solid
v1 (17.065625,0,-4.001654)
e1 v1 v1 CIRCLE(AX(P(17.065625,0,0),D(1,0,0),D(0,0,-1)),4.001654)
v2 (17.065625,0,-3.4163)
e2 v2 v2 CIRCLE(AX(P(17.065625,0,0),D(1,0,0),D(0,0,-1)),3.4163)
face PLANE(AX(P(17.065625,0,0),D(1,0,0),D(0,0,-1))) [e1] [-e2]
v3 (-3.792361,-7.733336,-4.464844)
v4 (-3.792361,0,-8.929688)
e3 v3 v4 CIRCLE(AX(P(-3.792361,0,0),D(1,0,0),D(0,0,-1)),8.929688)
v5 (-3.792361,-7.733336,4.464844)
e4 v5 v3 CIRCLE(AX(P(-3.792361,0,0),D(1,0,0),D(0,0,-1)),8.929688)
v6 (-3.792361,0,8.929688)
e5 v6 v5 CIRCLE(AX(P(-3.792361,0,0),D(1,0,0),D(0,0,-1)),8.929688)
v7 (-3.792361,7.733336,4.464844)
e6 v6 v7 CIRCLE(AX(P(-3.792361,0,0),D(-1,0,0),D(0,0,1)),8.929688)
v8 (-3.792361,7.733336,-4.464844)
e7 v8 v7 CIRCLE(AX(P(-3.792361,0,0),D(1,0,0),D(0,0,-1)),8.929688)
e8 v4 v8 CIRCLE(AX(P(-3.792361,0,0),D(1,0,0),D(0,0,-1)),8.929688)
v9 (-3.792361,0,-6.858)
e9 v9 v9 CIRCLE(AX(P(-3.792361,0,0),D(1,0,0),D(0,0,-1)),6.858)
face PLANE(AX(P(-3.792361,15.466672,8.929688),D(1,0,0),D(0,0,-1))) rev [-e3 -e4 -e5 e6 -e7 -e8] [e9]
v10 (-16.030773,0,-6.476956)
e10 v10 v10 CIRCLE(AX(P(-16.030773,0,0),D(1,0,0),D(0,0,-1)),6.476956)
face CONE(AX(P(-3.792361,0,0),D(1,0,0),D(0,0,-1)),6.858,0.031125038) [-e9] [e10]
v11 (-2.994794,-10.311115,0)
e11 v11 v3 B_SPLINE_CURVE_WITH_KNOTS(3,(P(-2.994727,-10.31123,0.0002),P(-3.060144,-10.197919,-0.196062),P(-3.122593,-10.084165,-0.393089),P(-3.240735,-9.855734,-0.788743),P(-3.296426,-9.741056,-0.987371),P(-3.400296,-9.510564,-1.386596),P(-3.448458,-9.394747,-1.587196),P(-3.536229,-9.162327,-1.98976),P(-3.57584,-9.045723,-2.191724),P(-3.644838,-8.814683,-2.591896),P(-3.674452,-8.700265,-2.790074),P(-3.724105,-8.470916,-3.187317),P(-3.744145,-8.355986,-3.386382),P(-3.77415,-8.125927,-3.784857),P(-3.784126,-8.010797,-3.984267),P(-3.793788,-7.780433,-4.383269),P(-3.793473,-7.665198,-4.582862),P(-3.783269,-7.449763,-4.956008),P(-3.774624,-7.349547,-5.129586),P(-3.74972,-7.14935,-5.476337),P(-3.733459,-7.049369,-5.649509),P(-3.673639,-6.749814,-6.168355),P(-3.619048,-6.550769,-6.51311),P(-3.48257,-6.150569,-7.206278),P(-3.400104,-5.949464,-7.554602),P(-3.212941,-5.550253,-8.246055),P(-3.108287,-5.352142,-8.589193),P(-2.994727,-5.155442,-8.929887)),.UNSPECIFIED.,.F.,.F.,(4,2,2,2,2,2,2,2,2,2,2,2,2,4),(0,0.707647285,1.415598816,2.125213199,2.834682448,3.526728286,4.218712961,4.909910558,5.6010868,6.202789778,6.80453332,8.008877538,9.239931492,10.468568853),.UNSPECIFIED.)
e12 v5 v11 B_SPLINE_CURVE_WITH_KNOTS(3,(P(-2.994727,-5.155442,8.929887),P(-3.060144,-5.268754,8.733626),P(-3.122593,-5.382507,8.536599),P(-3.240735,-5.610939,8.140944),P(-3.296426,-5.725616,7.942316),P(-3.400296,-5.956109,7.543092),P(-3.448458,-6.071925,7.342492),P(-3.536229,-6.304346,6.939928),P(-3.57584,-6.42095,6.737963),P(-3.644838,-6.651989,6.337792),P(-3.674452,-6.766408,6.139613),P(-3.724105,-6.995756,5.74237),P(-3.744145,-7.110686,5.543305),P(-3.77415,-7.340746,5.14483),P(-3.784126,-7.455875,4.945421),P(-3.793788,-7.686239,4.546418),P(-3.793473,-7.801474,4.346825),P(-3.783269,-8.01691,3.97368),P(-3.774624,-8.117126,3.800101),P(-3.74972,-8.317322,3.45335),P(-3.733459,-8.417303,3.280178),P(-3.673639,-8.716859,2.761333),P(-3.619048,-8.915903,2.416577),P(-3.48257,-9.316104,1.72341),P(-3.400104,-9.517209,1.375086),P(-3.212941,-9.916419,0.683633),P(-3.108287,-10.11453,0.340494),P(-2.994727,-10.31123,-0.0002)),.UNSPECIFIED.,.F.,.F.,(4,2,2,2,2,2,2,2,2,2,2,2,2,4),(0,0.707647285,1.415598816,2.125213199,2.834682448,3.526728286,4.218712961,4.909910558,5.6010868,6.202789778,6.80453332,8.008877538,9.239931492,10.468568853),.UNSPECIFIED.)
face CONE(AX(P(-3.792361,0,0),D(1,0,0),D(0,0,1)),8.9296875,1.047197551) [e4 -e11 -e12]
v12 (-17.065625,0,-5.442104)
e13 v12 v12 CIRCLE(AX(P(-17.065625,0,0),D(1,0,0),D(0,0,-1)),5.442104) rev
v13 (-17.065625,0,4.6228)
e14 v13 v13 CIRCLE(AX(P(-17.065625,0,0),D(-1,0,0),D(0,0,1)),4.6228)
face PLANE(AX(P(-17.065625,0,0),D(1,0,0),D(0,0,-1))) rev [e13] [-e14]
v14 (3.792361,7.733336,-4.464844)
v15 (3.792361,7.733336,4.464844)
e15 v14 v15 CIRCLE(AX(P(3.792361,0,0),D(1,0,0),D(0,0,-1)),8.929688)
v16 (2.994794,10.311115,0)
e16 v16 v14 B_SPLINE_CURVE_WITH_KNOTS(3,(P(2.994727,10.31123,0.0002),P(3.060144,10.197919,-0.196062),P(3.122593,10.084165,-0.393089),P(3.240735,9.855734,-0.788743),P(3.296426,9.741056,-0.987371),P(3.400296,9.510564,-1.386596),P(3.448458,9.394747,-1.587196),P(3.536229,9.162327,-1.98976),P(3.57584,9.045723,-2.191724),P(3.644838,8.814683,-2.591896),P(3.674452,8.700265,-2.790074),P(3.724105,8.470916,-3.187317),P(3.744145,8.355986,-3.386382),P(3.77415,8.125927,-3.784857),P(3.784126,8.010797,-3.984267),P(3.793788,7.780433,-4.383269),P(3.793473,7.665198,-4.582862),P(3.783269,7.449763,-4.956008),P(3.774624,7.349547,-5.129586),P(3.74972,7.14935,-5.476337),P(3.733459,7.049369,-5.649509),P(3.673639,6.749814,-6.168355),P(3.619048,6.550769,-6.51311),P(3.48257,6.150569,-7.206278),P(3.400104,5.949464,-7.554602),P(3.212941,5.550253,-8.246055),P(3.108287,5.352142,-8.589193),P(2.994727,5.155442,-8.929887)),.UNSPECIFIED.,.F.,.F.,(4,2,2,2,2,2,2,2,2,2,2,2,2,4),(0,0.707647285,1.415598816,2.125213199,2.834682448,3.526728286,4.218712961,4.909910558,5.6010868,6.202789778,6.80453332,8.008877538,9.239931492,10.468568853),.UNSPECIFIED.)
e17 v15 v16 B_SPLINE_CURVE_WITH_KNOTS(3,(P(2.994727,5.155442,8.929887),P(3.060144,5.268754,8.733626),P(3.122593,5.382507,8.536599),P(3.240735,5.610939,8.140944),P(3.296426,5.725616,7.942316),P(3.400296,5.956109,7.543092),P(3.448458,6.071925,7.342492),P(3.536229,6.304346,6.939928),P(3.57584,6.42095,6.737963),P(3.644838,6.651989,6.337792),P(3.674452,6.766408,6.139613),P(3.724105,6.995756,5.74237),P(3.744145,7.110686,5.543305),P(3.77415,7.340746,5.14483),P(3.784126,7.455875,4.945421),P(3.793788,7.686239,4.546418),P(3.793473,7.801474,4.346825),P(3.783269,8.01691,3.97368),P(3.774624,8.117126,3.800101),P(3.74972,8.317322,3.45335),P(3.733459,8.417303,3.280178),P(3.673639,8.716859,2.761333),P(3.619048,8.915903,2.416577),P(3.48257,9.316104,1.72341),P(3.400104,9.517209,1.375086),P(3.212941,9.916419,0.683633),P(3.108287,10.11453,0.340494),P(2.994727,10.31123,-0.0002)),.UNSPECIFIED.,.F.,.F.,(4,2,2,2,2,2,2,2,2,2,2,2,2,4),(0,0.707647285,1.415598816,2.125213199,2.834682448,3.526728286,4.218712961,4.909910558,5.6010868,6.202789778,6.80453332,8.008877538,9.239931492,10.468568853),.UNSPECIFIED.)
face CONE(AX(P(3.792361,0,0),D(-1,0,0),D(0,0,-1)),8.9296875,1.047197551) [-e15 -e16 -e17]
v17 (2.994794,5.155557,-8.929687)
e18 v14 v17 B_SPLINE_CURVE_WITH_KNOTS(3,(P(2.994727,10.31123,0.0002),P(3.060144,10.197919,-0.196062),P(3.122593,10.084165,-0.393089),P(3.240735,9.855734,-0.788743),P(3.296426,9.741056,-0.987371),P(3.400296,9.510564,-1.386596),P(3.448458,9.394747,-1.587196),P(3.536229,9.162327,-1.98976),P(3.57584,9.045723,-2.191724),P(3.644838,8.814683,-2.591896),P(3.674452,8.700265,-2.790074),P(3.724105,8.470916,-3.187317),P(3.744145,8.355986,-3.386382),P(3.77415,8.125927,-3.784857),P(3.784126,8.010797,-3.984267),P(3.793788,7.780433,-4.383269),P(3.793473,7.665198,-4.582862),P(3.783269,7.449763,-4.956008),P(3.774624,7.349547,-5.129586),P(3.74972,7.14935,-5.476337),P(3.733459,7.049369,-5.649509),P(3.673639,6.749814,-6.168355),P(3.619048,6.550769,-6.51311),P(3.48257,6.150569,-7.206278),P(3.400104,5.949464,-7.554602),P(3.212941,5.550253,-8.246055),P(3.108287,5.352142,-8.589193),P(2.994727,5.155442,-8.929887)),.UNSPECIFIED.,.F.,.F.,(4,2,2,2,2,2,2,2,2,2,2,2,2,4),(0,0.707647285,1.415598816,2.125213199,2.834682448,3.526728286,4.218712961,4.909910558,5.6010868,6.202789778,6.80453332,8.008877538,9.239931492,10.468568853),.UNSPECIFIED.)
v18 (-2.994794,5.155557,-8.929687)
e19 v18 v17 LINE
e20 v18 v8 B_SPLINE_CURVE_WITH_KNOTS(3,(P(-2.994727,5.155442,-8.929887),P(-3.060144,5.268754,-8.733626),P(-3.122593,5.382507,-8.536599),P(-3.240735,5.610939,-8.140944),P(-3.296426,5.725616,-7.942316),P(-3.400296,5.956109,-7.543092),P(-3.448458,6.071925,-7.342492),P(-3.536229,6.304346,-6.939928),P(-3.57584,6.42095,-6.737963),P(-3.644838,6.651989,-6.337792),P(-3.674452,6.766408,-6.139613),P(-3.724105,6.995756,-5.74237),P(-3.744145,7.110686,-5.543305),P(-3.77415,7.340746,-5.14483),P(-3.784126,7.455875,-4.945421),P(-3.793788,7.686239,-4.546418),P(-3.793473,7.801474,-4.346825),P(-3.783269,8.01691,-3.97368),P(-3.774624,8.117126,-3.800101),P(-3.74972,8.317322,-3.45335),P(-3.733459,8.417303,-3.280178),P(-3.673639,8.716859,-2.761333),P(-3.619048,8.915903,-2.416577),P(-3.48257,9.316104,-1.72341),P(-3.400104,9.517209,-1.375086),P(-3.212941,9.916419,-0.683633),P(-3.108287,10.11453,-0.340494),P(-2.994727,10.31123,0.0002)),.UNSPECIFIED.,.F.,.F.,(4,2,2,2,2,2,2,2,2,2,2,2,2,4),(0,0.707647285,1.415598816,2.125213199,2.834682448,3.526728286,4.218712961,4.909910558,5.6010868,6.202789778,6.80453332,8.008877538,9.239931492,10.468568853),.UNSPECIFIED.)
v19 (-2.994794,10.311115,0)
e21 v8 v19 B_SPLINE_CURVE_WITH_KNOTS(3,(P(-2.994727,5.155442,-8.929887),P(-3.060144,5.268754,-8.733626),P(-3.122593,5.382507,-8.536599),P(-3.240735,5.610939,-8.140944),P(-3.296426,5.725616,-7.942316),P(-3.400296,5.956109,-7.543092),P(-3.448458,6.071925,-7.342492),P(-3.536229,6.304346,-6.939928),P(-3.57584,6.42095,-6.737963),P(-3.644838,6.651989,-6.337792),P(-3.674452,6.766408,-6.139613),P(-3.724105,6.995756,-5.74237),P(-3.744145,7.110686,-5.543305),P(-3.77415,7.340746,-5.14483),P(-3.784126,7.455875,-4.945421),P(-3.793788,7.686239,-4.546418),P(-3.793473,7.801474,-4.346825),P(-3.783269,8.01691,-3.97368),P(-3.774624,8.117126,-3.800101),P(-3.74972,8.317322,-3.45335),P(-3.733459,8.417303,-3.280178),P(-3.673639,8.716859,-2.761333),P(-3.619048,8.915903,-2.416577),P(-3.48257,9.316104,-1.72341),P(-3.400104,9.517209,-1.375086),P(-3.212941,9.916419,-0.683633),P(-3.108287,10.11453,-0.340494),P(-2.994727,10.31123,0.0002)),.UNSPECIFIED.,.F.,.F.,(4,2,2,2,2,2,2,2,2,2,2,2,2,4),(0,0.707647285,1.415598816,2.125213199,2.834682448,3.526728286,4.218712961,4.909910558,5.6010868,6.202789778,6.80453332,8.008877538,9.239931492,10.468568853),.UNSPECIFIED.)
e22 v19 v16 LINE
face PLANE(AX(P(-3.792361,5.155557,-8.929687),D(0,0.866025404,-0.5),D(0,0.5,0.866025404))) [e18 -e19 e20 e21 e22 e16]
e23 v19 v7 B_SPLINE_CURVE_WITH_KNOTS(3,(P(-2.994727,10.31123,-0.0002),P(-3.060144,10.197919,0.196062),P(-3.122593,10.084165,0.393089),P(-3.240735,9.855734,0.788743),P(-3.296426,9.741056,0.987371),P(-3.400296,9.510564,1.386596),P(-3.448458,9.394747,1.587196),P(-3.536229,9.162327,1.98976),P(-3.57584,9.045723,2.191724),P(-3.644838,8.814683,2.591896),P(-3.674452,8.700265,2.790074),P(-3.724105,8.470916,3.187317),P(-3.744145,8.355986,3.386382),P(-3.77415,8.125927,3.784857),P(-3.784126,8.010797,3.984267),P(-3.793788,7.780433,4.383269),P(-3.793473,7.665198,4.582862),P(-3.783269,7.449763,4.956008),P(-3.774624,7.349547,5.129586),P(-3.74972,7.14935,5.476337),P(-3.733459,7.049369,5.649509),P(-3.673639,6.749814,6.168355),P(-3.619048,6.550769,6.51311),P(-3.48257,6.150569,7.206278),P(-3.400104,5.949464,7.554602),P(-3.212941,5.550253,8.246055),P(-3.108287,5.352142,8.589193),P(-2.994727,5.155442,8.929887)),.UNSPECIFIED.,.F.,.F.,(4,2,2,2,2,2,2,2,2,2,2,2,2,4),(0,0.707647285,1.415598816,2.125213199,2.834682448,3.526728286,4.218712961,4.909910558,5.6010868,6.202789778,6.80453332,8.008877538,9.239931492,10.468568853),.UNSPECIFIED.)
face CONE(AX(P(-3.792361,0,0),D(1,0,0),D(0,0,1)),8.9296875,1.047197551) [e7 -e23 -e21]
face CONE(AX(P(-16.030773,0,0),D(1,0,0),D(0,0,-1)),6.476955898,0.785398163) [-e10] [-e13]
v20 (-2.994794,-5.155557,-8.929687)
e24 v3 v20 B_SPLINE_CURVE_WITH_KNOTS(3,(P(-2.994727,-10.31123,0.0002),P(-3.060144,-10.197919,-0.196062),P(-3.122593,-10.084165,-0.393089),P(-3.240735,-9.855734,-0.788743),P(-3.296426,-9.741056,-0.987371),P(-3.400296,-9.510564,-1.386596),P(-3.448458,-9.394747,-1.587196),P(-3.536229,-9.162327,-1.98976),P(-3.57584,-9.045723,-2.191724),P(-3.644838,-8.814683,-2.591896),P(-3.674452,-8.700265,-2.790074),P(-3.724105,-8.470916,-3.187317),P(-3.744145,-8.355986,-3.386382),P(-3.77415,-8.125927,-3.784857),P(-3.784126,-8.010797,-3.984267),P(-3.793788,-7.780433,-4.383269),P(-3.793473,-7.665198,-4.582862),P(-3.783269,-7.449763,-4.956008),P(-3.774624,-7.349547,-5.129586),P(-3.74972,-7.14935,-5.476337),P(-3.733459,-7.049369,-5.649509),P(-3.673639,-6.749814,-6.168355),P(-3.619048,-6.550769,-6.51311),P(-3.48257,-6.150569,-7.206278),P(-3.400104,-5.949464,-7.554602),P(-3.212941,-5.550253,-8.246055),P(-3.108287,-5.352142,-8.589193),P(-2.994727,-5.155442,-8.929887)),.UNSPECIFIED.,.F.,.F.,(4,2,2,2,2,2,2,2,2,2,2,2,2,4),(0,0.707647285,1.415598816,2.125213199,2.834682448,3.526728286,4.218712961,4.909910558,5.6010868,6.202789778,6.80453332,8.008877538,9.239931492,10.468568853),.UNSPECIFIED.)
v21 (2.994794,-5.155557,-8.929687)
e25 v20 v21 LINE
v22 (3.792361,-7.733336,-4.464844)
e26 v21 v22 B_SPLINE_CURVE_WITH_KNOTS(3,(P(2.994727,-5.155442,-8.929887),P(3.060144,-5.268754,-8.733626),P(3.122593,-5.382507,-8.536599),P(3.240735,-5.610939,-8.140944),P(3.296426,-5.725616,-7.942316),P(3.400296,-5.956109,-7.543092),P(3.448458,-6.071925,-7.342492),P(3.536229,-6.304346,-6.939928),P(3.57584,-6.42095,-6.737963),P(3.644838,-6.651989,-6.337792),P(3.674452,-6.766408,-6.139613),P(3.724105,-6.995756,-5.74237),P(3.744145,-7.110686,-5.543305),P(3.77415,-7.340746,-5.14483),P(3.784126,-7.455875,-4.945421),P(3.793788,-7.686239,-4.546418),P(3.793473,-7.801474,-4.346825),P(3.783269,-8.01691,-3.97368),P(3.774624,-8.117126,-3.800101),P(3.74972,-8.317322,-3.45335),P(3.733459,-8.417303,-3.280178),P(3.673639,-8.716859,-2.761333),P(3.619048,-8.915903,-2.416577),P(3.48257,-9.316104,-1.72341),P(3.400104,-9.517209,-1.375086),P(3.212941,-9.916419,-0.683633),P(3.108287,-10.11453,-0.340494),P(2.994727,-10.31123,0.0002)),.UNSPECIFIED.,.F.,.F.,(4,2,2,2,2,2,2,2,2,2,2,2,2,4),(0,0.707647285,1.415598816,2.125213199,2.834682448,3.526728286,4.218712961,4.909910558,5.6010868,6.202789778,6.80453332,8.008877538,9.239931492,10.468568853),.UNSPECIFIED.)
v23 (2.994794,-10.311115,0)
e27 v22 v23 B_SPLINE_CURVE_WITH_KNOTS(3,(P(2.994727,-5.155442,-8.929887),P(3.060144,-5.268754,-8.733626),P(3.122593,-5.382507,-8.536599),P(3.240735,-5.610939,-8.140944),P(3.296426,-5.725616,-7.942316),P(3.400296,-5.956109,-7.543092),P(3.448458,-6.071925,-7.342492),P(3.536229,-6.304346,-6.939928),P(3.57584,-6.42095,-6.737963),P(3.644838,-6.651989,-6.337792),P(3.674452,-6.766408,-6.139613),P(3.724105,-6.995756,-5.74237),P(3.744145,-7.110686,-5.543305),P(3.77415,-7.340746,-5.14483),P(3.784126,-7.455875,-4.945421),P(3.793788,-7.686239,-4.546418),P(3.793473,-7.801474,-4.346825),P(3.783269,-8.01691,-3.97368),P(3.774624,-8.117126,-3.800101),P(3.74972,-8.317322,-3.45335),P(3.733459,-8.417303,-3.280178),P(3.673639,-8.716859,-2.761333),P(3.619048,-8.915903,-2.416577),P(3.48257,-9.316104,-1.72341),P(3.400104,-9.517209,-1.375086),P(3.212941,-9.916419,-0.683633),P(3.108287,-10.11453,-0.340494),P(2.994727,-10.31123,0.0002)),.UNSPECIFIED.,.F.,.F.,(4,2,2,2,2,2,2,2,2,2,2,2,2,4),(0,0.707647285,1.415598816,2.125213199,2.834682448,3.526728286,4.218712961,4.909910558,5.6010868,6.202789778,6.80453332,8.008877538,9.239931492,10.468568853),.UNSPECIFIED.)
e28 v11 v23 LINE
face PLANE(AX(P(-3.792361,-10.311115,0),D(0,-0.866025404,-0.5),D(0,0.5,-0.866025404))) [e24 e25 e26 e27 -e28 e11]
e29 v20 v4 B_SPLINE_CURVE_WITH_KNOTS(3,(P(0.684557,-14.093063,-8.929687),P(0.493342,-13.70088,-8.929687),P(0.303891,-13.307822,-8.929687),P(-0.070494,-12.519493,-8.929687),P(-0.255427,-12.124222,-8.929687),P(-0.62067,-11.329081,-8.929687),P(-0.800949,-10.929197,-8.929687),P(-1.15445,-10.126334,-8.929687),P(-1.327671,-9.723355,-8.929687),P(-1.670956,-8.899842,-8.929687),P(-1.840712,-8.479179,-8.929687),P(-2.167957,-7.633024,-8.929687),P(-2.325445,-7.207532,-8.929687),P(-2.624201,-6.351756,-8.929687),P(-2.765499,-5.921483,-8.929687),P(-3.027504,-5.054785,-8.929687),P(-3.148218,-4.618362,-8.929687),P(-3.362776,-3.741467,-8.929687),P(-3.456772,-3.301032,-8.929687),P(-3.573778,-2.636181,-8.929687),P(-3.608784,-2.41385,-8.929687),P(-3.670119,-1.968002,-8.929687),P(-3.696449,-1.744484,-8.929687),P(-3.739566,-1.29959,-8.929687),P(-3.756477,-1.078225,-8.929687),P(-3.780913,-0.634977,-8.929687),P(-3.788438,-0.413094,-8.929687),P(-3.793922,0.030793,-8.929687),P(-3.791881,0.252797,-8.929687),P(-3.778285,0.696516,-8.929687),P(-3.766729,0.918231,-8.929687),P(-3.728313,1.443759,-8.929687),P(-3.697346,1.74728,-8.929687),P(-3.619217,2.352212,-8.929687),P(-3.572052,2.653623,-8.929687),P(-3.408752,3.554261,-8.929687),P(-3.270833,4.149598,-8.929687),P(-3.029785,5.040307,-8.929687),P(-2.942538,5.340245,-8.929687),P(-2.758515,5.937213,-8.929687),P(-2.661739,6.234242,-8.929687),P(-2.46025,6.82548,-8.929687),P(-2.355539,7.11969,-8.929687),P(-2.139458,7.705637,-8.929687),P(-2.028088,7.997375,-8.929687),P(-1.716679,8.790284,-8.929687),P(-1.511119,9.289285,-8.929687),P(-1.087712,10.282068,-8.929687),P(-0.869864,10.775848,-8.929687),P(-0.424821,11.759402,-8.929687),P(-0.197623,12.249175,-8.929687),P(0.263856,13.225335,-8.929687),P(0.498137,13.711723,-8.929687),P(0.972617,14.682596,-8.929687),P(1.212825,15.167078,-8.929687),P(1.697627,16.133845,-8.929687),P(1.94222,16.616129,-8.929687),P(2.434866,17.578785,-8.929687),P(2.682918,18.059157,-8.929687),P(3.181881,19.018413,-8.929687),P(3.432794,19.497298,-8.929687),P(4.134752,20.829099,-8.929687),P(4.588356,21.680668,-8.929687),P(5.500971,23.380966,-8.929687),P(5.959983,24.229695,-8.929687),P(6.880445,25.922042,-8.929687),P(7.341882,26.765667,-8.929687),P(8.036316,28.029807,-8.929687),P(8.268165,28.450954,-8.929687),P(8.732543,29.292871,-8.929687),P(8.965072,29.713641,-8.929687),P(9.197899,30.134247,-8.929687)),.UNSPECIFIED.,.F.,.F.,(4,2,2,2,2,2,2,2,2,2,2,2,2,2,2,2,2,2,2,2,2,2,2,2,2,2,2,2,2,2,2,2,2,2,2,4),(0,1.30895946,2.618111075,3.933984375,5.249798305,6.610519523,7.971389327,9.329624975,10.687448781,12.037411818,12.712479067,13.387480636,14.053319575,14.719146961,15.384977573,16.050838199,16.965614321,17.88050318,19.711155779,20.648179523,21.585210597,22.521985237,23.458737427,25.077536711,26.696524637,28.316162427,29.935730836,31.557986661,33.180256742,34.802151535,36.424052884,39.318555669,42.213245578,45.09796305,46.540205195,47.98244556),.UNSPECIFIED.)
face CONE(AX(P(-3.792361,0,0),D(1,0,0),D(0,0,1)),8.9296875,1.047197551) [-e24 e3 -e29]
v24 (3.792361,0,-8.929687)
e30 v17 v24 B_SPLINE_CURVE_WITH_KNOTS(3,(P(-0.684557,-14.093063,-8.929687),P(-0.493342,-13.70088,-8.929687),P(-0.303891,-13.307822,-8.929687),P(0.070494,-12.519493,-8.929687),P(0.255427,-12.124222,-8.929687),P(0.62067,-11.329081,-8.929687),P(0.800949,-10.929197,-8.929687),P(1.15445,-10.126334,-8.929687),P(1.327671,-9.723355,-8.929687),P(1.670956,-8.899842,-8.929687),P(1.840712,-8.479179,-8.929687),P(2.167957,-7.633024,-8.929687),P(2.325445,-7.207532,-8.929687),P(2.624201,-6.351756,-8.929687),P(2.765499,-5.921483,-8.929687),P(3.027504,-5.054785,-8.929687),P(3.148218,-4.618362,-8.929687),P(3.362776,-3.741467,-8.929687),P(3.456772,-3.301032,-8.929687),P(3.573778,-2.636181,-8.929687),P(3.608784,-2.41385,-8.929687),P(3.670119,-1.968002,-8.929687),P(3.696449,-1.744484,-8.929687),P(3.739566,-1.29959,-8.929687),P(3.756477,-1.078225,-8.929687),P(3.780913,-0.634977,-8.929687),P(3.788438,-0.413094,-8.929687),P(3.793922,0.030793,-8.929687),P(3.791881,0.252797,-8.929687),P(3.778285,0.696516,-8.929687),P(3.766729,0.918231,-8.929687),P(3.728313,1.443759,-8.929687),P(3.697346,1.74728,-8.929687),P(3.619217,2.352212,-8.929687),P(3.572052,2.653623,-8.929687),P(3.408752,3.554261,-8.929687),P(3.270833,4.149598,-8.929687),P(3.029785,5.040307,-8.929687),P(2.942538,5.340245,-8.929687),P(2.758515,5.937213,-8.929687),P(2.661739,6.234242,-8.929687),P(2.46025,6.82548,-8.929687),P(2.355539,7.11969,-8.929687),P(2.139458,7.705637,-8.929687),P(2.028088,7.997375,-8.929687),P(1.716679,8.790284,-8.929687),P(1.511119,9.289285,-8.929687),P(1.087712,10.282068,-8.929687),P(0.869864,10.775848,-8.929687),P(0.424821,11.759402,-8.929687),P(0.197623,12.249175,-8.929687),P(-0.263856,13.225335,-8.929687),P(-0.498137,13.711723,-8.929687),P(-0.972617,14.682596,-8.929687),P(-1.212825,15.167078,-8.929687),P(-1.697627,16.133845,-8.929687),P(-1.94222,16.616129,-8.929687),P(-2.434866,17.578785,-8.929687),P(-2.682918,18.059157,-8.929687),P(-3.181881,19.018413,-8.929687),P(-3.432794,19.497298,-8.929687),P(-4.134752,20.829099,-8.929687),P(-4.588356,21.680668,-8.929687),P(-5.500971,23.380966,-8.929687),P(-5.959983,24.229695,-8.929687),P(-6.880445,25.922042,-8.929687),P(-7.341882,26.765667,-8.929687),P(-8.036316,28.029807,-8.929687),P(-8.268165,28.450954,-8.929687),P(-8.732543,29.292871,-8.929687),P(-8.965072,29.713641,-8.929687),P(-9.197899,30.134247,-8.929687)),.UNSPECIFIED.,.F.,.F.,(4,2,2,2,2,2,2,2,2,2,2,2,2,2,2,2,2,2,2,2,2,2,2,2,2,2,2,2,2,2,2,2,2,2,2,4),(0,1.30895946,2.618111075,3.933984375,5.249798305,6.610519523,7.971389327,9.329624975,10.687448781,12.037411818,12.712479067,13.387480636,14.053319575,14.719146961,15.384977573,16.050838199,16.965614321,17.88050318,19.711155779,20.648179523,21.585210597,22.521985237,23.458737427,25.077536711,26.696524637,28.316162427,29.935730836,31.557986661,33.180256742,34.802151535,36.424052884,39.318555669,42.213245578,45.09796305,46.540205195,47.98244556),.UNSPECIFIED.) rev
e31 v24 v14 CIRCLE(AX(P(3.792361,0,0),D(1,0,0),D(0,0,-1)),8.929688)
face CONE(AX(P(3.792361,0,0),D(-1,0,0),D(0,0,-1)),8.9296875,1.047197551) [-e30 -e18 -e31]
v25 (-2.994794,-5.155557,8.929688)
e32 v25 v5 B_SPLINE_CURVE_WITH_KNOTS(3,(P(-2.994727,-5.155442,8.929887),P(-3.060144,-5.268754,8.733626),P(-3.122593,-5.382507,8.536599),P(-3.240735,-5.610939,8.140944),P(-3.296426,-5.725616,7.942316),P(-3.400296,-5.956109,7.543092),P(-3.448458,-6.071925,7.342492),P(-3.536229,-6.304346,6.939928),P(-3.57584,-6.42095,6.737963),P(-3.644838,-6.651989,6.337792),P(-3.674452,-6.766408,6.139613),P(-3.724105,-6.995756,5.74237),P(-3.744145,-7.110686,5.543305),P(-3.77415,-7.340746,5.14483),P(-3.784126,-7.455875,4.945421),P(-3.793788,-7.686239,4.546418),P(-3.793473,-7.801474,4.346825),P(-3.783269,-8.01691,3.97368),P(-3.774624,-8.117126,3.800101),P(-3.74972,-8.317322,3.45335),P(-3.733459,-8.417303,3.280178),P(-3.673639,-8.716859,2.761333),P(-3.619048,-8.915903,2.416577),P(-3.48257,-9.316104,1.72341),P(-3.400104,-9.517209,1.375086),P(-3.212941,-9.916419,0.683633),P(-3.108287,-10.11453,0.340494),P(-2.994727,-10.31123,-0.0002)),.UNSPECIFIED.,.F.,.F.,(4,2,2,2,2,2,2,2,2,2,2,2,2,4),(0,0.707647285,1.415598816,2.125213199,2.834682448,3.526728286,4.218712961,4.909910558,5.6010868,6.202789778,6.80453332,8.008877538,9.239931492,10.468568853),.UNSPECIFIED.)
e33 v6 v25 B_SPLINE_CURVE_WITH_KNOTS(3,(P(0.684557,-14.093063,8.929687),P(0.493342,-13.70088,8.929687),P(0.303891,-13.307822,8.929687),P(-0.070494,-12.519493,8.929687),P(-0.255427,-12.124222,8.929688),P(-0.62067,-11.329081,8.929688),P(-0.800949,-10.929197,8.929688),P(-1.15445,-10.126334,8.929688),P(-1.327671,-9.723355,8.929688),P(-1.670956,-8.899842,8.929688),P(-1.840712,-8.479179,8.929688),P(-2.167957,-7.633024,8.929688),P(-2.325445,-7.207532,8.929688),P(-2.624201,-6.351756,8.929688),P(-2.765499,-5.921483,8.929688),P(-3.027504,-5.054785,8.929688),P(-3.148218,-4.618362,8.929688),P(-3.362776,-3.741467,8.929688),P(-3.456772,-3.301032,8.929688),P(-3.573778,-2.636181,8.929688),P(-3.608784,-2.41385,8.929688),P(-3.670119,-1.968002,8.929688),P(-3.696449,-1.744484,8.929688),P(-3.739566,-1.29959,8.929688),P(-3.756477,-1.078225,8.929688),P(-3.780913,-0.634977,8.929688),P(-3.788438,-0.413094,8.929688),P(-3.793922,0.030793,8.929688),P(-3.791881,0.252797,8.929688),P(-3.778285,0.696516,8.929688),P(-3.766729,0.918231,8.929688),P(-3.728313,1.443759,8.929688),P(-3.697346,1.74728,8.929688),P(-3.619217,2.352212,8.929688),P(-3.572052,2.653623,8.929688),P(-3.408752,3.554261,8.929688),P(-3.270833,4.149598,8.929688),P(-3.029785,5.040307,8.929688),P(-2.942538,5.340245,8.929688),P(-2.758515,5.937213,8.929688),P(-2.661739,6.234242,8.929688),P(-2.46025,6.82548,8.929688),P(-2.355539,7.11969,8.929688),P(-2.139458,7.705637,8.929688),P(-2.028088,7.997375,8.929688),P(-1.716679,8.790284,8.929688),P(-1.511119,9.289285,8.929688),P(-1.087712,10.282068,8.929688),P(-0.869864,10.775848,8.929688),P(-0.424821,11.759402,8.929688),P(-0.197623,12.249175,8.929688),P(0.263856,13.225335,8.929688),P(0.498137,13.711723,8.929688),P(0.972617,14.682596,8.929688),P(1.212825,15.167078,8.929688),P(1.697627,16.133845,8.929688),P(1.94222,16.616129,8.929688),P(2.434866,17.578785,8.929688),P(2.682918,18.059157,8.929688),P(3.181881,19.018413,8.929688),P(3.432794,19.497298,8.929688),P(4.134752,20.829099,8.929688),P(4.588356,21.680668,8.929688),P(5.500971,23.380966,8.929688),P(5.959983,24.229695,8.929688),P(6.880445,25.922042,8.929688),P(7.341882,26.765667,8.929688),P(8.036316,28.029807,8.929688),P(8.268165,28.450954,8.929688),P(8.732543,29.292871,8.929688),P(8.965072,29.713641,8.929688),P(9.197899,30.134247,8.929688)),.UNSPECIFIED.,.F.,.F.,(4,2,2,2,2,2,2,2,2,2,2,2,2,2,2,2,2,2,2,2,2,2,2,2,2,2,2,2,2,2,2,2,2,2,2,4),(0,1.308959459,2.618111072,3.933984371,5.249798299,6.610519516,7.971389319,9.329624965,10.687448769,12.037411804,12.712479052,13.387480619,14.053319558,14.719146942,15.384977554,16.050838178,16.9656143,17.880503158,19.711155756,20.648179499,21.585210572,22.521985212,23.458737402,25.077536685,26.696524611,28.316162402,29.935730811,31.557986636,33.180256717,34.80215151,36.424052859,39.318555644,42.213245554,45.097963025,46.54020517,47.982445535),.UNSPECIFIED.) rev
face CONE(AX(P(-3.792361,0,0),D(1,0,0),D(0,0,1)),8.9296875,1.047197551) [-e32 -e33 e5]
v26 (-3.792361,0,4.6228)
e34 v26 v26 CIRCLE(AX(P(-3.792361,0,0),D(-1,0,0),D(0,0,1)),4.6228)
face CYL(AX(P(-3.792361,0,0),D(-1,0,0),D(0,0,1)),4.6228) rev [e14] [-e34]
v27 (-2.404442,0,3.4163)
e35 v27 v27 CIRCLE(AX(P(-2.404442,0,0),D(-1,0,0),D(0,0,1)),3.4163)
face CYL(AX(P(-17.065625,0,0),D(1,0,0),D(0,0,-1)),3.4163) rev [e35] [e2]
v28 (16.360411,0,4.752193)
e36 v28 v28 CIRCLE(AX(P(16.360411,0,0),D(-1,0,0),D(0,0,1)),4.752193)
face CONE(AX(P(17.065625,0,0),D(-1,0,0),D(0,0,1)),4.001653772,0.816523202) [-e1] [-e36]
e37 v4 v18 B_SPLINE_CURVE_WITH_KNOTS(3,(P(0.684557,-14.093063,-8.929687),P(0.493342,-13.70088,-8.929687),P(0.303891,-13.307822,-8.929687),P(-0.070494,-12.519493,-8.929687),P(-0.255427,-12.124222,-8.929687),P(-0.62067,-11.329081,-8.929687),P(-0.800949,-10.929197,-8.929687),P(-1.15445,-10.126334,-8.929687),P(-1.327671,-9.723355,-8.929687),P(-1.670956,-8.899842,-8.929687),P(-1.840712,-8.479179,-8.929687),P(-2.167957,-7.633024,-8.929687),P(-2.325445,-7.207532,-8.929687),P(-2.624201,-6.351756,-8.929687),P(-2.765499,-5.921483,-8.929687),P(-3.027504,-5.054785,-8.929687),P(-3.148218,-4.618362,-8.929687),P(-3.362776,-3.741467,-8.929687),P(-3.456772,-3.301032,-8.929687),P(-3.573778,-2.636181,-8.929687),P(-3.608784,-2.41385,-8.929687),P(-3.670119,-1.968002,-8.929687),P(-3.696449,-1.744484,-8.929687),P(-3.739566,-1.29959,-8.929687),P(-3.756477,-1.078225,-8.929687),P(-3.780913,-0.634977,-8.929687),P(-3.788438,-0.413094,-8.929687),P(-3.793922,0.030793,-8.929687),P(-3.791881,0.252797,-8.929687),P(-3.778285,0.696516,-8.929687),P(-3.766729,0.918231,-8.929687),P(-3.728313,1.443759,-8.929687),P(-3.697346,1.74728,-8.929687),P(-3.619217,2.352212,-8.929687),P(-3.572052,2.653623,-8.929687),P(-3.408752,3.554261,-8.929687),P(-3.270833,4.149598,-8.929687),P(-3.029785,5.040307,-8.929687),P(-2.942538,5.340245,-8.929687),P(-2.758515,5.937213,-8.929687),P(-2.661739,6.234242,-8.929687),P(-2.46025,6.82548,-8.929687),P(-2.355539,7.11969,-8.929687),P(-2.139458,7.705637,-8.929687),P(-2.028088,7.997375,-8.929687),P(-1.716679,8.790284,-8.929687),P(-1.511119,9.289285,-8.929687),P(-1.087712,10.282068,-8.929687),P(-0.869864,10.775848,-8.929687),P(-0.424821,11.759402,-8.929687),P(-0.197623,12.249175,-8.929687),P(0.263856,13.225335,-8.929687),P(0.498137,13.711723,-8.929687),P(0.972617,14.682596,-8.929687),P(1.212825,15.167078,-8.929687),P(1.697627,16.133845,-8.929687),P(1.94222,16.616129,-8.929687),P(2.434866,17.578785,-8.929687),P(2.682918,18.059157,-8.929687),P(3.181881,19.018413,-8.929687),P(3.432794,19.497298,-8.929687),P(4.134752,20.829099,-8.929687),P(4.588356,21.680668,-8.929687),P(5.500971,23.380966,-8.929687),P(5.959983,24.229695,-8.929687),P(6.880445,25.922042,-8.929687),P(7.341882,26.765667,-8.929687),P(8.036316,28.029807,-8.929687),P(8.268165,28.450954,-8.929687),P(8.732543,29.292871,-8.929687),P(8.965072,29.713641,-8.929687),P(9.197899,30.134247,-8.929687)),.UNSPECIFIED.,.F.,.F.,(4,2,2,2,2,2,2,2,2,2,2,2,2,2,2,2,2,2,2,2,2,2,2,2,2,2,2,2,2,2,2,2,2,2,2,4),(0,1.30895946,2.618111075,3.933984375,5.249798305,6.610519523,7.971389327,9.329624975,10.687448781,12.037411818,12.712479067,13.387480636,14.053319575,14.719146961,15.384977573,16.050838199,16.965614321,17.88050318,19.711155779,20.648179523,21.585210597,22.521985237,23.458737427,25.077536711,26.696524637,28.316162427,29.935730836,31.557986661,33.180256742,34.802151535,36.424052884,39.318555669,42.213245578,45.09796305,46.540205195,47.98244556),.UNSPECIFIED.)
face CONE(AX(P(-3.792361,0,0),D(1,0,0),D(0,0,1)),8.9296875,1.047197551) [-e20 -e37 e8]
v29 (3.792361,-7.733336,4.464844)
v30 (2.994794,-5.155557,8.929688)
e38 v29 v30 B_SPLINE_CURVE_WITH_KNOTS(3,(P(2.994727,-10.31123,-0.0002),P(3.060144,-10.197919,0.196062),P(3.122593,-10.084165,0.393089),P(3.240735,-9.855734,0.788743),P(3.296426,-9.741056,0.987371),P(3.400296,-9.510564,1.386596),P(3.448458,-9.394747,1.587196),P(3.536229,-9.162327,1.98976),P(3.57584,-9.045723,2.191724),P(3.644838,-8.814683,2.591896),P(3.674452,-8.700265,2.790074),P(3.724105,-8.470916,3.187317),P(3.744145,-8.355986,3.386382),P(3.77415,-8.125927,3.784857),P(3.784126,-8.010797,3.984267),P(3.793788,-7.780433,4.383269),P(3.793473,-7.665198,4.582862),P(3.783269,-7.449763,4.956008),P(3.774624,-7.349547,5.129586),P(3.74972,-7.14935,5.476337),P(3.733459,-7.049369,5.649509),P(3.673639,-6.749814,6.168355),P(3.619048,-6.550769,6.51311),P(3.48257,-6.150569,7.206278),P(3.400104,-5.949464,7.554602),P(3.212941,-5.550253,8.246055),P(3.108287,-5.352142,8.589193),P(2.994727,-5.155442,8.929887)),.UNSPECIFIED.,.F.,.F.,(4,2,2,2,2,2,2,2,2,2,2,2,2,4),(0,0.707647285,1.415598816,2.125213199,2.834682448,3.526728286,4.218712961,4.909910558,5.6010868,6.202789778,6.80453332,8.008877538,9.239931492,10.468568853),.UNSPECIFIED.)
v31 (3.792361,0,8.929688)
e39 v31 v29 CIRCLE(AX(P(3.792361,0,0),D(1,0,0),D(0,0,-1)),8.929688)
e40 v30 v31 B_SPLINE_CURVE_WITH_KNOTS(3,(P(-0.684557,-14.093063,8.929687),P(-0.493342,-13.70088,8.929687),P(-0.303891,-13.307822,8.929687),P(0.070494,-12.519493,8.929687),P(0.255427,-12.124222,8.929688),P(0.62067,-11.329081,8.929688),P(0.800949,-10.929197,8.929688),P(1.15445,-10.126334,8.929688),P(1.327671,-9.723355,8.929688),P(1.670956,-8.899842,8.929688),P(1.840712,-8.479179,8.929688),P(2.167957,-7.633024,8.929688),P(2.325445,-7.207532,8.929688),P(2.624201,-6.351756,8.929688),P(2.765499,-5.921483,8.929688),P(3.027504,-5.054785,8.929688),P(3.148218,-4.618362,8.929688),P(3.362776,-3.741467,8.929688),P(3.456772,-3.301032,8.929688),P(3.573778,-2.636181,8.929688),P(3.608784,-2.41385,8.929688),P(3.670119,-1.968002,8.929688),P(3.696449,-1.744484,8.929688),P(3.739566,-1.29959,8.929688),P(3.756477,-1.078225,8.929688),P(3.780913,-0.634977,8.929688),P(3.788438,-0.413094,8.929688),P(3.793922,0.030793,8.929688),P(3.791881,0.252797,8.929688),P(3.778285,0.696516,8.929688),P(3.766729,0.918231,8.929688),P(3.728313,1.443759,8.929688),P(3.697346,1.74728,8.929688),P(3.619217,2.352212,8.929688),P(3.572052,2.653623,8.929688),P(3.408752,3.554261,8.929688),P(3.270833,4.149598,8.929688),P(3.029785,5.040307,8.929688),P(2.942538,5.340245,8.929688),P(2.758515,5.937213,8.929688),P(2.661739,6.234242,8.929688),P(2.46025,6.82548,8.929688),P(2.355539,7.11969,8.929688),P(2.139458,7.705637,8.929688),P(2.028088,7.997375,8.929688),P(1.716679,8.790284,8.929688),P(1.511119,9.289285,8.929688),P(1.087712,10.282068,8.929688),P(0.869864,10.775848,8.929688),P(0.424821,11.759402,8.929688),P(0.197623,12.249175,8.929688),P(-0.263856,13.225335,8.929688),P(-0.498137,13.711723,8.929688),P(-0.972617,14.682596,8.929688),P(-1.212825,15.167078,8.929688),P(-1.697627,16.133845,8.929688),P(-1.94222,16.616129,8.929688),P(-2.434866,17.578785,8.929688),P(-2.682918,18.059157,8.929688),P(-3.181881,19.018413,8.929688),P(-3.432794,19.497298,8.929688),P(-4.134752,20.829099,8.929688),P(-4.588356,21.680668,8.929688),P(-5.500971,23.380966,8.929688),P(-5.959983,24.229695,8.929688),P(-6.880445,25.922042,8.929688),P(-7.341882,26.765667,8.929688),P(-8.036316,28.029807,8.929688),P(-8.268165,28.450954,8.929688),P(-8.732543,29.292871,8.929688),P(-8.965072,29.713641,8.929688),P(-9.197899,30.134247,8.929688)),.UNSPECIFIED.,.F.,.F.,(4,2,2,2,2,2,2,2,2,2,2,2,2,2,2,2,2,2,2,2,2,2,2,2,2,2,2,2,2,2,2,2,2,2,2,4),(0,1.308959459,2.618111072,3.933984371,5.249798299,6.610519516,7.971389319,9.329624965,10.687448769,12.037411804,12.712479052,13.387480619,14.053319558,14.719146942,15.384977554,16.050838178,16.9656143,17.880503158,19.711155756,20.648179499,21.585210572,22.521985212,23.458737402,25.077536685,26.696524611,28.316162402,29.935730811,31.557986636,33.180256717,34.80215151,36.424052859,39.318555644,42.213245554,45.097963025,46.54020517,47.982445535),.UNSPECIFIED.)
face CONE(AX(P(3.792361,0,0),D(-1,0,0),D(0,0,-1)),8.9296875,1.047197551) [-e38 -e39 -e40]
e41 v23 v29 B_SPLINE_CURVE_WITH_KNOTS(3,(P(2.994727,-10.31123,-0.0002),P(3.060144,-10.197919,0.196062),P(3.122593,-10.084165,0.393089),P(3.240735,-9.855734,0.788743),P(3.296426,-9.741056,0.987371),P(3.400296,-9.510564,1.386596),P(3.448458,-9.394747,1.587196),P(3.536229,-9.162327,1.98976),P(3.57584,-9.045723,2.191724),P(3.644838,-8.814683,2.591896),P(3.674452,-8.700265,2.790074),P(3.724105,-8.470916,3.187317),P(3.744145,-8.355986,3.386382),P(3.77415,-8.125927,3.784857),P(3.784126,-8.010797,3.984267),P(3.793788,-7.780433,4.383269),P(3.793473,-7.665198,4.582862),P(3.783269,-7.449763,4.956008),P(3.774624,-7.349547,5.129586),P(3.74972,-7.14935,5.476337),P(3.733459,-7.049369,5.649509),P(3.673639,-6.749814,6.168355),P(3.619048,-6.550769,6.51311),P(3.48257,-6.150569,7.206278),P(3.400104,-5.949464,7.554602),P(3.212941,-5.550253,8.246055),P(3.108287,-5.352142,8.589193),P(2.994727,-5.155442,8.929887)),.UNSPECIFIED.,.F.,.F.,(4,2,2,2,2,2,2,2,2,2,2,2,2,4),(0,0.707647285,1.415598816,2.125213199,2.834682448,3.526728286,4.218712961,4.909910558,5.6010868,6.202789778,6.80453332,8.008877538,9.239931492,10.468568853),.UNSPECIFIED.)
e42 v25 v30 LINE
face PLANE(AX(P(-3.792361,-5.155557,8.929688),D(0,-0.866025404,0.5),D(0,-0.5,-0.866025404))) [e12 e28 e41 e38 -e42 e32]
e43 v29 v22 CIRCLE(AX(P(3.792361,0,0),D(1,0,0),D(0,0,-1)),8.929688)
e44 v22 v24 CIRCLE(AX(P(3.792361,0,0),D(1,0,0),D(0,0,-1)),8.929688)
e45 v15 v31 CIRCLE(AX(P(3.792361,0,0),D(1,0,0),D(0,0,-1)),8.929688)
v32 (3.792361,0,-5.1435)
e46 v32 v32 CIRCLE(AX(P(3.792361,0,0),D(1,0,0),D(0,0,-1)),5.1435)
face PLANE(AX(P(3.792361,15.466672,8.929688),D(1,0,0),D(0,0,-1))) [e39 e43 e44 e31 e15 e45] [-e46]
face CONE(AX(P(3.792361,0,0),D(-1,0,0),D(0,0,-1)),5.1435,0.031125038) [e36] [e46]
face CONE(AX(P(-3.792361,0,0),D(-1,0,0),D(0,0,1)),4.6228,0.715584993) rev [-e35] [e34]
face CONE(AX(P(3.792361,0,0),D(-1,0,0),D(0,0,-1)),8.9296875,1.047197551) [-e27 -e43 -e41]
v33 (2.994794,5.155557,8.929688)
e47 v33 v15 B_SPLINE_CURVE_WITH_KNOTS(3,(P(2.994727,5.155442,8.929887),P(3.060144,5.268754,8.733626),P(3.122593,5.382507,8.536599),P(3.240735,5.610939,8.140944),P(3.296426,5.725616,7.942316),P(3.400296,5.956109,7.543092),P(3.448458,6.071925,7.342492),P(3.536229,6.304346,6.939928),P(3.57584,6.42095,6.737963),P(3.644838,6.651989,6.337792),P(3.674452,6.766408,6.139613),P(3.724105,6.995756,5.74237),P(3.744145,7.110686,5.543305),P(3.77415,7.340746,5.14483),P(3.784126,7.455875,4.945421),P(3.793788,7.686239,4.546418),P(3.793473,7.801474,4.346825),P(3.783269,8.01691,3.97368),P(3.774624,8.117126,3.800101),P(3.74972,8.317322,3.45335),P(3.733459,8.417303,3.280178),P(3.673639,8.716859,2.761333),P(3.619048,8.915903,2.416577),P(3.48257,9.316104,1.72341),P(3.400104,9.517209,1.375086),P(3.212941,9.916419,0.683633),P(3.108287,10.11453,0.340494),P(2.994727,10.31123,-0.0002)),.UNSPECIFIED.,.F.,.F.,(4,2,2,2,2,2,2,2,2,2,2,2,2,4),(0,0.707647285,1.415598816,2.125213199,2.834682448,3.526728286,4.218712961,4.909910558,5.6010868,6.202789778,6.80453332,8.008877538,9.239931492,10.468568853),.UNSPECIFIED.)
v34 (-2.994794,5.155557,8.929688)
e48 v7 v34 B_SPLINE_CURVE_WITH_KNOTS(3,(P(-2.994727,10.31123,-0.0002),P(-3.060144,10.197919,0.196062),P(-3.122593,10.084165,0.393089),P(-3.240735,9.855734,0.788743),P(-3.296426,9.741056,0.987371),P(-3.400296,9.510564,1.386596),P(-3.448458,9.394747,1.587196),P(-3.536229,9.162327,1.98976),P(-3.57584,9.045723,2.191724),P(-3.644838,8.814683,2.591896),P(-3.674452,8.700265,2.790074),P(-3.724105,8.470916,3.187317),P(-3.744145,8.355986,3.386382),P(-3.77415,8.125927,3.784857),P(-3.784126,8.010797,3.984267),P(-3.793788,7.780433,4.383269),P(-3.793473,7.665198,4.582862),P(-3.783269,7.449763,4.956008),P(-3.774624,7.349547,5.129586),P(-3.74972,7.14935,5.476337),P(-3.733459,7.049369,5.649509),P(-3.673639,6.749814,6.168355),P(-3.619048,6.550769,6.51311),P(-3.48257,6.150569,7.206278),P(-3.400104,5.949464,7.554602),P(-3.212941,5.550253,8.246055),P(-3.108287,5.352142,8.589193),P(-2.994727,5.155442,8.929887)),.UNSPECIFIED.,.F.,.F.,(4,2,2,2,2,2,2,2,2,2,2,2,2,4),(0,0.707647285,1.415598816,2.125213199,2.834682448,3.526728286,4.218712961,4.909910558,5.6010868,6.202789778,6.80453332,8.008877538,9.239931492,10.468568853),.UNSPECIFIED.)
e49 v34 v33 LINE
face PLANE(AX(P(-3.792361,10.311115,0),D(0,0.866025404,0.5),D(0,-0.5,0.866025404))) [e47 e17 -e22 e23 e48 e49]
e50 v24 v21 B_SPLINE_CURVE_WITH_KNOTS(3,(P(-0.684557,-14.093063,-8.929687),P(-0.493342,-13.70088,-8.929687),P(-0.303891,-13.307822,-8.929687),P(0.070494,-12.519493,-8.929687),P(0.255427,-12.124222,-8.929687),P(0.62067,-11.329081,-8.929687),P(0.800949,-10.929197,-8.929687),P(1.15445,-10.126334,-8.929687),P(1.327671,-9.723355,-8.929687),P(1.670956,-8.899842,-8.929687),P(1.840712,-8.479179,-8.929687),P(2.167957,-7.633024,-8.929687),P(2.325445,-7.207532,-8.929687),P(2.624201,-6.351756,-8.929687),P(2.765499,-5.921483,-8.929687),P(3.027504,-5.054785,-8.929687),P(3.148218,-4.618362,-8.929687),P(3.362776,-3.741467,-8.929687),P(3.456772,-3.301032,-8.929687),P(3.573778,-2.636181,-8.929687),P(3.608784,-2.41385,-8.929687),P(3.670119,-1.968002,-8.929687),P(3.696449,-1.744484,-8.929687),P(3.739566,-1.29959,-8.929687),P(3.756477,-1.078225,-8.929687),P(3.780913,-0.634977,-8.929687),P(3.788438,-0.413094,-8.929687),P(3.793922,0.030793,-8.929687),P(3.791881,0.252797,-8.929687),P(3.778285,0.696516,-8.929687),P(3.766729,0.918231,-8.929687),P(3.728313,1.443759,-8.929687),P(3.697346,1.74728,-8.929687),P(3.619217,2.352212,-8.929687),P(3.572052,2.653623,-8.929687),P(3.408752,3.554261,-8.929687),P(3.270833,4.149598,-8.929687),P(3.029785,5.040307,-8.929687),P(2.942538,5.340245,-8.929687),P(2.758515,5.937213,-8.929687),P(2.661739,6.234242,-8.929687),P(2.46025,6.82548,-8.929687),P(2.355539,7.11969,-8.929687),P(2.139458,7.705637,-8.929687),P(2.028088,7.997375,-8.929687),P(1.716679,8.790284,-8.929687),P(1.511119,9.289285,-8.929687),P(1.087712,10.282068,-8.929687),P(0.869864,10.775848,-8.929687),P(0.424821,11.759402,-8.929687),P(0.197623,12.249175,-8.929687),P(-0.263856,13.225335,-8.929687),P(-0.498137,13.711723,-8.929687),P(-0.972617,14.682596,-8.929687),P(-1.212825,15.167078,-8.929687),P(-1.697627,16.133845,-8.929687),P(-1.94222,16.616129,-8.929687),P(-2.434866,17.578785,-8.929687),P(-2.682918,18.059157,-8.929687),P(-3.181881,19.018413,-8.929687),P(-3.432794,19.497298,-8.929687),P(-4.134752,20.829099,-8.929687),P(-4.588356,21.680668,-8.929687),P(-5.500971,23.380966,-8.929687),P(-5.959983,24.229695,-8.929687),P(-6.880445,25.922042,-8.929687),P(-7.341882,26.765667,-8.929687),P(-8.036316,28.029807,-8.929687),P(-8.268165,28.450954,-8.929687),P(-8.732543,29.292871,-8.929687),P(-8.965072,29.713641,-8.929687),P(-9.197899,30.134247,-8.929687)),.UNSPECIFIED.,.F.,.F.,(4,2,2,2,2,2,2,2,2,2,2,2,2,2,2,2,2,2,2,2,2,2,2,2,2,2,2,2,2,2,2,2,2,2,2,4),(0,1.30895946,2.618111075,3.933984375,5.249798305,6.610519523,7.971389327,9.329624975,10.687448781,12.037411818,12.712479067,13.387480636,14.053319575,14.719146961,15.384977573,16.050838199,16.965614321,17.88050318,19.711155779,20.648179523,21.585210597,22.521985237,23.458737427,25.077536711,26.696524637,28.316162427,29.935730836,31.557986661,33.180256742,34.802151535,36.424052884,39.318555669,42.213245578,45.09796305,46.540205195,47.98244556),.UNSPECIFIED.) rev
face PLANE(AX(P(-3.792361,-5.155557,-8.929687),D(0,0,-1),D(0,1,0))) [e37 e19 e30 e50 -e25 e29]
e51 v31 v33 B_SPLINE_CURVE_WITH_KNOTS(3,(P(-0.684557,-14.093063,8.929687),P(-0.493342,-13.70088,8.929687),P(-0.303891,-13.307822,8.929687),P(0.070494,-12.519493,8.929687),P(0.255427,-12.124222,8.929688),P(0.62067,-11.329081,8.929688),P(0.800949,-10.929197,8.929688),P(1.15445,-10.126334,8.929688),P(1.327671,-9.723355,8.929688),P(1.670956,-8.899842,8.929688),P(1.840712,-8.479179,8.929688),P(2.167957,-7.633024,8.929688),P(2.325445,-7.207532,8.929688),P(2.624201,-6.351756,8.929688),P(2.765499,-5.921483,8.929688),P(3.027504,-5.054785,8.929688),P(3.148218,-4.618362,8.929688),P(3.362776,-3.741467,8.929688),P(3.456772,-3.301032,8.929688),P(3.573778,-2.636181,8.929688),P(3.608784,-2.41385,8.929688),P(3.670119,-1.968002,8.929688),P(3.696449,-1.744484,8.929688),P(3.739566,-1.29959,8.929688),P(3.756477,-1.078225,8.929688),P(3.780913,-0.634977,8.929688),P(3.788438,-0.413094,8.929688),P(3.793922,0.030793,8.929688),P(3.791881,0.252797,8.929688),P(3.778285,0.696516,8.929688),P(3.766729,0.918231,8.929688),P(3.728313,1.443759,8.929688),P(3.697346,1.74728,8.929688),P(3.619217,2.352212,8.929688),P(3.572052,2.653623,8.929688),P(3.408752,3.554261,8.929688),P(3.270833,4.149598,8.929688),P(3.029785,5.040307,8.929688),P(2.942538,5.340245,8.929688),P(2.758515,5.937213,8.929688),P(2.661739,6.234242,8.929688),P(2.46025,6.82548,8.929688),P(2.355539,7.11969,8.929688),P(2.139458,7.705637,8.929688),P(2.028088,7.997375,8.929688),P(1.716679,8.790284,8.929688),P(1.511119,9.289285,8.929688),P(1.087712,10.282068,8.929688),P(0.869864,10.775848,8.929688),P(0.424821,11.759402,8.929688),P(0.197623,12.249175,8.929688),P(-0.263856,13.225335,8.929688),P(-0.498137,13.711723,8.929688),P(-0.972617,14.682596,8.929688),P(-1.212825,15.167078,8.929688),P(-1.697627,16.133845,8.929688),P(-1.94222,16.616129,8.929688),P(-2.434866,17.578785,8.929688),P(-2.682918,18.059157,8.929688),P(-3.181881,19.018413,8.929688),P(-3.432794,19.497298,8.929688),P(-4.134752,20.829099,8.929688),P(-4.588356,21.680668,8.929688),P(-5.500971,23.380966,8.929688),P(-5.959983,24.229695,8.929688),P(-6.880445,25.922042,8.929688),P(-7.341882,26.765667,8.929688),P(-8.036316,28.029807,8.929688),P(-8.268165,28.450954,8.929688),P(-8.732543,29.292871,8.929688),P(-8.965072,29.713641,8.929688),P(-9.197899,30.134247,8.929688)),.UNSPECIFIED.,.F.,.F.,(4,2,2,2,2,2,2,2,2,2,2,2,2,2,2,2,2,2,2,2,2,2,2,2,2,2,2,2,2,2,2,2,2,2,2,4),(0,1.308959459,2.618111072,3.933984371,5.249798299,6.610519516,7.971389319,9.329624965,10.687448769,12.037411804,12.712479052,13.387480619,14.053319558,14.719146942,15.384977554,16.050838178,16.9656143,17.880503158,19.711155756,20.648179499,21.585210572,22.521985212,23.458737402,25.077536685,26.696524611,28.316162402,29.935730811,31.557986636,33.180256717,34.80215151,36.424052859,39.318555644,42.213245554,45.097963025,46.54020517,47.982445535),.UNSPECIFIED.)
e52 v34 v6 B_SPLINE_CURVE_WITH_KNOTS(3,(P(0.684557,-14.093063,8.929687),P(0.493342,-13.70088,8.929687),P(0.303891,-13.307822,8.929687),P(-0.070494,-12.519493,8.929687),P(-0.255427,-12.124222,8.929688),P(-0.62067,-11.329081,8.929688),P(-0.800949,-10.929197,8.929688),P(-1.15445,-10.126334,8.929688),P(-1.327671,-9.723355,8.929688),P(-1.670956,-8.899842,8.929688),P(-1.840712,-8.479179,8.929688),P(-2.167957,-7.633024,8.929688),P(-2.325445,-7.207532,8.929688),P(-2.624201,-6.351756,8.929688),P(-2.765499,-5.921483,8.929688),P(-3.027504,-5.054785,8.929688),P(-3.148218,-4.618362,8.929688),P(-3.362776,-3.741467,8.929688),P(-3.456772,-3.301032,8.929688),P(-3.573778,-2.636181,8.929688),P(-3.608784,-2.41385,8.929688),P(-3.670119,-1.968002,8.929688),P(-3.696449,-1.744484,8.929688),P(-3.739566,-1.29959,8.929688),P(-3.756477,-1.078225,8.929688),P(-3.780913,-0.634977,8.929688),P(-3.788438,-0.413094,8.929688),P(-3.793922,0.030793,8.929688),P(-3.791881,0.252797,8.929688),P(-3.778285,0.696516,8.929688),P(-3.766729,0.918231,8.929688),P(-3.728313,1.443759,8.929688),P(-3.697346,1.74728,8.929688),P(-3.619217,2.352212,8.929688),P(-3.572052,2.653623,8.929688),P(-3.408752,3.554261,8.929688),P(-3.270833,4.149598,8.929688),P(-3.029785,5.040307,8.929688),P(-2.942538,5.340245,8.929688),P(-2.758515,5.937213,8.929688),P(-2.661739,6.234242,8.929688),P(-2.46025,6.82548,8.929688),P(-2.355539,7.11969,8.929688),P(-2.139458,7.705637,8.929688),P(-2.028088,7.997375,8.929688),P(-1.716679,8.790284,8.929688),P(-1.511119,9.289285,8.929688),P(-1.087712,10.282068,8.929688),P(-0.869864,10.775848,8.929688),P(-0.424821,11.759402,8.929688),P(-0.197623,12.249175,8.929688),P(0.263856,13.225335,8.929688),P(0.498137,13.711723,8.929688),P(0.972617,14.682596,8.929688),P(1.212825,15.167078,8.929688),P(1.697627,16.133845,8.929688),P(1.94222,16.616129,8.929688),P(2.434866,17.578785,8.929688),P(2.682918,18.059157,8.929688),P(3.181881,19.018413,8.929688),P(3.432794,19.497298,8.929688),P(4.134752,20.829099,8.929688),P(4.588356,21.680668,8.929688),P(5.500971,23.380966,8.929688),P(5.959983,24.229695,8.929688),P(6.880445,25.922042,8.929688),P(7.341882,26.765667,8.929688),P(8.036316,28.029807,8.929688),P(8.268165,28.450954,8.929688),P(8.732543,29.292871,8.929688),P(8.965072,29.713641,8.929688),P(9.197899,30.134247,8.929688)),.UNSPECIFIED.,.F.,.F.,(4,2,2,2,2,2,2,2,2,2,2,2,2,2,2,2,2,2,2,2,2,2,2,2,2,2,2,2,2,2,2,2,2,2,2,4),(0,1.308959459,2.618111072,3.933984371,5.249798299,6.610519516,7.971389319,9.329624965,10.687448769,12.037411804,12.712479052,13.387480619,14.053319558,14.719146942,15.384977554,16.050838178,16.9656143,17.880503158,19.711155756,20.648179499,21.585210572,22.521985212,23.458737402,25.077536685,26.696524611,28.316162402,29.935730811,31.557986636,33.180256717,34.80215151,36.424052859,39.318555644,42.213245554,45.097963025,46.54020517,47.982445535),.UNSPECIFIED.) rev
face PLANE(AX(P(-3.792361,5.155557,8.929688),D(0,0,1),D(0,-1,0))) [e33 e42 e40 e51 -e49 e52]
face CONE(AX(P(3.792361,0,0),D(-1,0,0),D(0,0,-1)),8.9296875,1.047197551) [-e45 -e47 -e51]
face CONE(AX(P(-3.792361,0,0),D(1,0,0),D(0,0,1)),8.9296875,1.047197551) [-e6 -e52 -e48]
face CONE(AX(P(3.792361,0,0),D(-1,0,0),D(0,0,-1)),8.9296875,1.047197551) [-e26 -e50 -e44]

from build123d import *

# Parameters (mm, degrees)
SKETCH2_R           = 6.858
EXTRUDE1_DEPTH      = 13.273264
EXTRUDE1_DRAFT      = -1.783333333
CHAMFER1_SIZE       = 1.002631579
CHAMFER1_SIZE2      = 1.035353254
SKETCH5_R           = 5.1435
EXTRUDE2_DEPTH      = 13.273264
EXTRUDE2_TAPER      = 1.783333333
CHAMFER2_SIZE       = 0.705555556
CHAMFER2_SIZE_2     = 0.728581919
EXTRUDE3_DEPTH      = 3.792361
EXTRUDE3_DEPTH_BACK = 3.792361
SKETCH10_OUTSIDE_W  = 118.396
SKETCH10_OUTSIDE_H  = 121.158
SKETCH10_OUTSIDE_R  = 8.9296875
CUT_EXTRUDE1_DEPTH  = 25.922158813
CUT_EXTRUDE1_DRAFT  = -60
SKETCH11_OUTSIDE_W  = 118.396
SKETCH11_OUTSIDE_H  = 121.158
SKETCH11_OUTSIDE_R  = 8.9296875
CUT_EXTRUDE2_DEPTH  = 25.922158813
CUT_EXTRUDE2_DRAFT  = -60
SKETCH12_R          = 4.6228
CUT_EXTRUDE3_DEPTH  = 13.273265
SKETCH13_R          = 3.4163
CUT_EXTRUDE4_DEPTH  = 37.75596067


with BuildPart() as part:
    # Sketch2 → Extrude1 (with draft: the straight prism first)
    with BuildSketch(Plane(origin=(-3.792361111, 0, 0), x_dir=(0, 0, -1), z_dir=(1, 0, 0))):
        Circle(SKETCH2_R)
    extrude(amount=-EXTRUDE1_DEPTH)
    # Extrude1: the draft: its side faces are tilted about the plane it starts from
    extrude1_sides = [part.faces().sort_by_distance(p)[0] for p in [
        (-10.428993111, 0, 6.858),
    ]]
    draft(extrude1_sides, Plane(origin=(-3.792361111, 0, 0), x_dir=(0, 0, -1), z_dir=(1, 0, 0)), EXTRUDE1_DRAFT)

    # Chamfer1
    chamfer1_edges = [part.edges().sort_by_distance(p)[0] for p in [
        (-17.065625111, 0, 6.444735688),
    ]]
    chamfer1_side = [part.faces().sort_by_distance(p)[0] for p in [
        (-17.065625111, 0, 0),
    ]]
    chamfer(chamfer1_edges, length=CHAMFER1_SIZE, length2=CHAMFER1_SIZE2, reference=chamfer1_side[0])



with BuildPart() as body_2:
    # Sketch5 → Extrude2 (new body)
    with BuildSketch(Plane(origin=(3.792361111, 0, 0), x_dir=(0, 0, -1), z_dir=(1, 0, 0))):
        Circle(SKETCH5_R)
    extrude(amount=EXTRUDE2_DEPTH, taper=EXTRUDE2_TAPER)

    # Chamfer2
    # the kernel refuses this chamfer: 0.728581919, 0.705555556 mm, written as the material it takes off along each edge
    with BuildSketch(Plane(origin=(17.065625111, 0, 0), x_dir=(0, 0, -1), z_dir=(0, 1, 0))) as chamfer2_piece_1:
        Polygon((4.730235688 + CHAMFER2_SIZE * 0.0311200130608, CHAMFER2_SIZE * 0.999515654468), (4.730235688 - CHAMFER2_SIZE_2, 0), (4.730235688, 0), align=None)
    revolve(axis=Axis((17.065625111, 0, 0), (-1, 0, 0)), mode=Mode.SUBTRACT)


with BuildPart() as part_1:
    add(part.part)

    add(body_2.part)  # Revolve1 merges body 2
    # Sketch8 → Revolve1 (revolve)
    with BuildSketch(Plane.XY, mode=Mode.PRIVATE) as revolve1_sk:
        Polygon((0, 6.858), (-3.792361111, 6.858), (-10.476571637, 5.066971187), (-10.476571637, 0), (10.476571637, 0), (10.476571637, 3.352471187), (3.792361111, 5.1435), (0, 5.1435), align=None)
    revolve(revolve1_sk.sketch.rotate(Axis((-17.065625, 0, 0), (1, 0, 0)), 90), axis=Axis((-17.065625, 0, 0), (1, 0, 0)))

    # Sketch9 → Extrude3 (add, two sides: drawn at the far end of the back side and taken through both)
    with BuildSketch(Plane(origin=(0, 0, 0), x_dir=(0, 0, -1), z_dir=(1, 0, 0)).offset(-EXTRUDE3_DEPTH_BACK)):
        Polygon((0, 10.311114964), (-8.9296875, 5.155557482), (-8.9296875, -5.155557482), (0, -10.311114964), (8.9296875, -5.155557482), (8.9296875, 5.155557482), align=None)
    extrude(amount=EXTRUDE3_DEPTH + EXTRUDE3_DEPTH_BACK)


with BuildPart() as cut_extrude1_tool:
    # Sketch10 outside → Cut-Extrude1 (with draft: the straight prism first)
    with BuildSketch(Plane(origin=(3.792361111, 0, 0), x_dir=(0, 0, -1), z_dir=(1, 0, 0))):
        Rectangle(SKETCH10_OUTSIDE_W, SKETCH10_OUTSIDE_H)
        Circle(SKETCH10_OUTSIDE_R, mode=Mode.SUBTRACT)
    extrude(amount=-CUT_EXTRUDE1_DEPTH)
    # Cut-Extrude1: the draft: its side faces are tilted about the plane it starts from
    cut_extrude1_sides = [cut_extrude1_tool.faces().sort_by_distance(p)[0] for p in [
        (-9.168718295, -60.579, 0),
        (-9.168718295, 0, -59.198),
        (-9.168718295, 60.579, 0),
        (-9.168718295, 0, 59.198),
        (-9.168718295, 0, 8.9296875),
    ]]
    draft(cut_extrude1_sides, Plane(origin=(3.792361111, 0, 0), x_dir=(0, 0, -1), z_dir=(1, 0, 0)), CUT_EXTRUDE1_DRAFT)


with BuildPart() as part_2:
    add(part_1.part)

    # Cut-Extrude1: cut by cut_extrude1_tool
    add(cut_extrude1_tool.part, mode=Mode.SUBTRACT)


with BuildPart() as cut_extrude2_tool:
    # Sketch11 outside → Cut-Extrude2 (with draft: the straight prism first)
    with BuildSketch(Plane.ZY.offset(3.792361111)):
        Rectangle(SKETCH11_OUTSIDE_W, SKETCH11_OUTSIDE_H)
        Circle(SKETCH11_OUTSIDE_R, mode=Mode.SUBTRACT)
    extrude(amount=-CUT_EXTRUDE2_DEPTH)
    # Cut-Extrude2: the draft: its side faces are tilted about the plane it starts from
    cut_extrude2_sides = [cut_extrude2_tool.faces().sort_by_distance(p)[0] for p in [
        (9.168718295, -60.579, 0),
        (9.168718295, 0, 59.198),
        (9.168718295, 60.579, 0),
        (9.168718295, 0, -59.198),
        (9.168718295, 0, -8.9296875),
    ]]
    draft(cut_extrude2_sides, Plane.ZY.offset(3.792361111), CUT_EXTRUDE2_DRAFT)


with BuildPart() as part_3:
    add(part_2.part)

    # Cut-Extrude2: cut by cut_extrude2_tool
    add(cut_extrude2_tool.part, mode=Mode.SUBTRACT)

    # Sketch12 → Cut-Extrude3 (cut)
    with BuildSketch(Plane.ZY.offset(17.065625)):
        Circle(SKETCH12_R)
    extrude(amount=-CUT_EXTRUDE3_DEPTH, mode=Mode.SUBTRACT)

    # Sketch13 → Cut-Extrude4 (cut, through all)
    with BuildSketch(Plane(origin=(17.065625, 0, 0), x_dir=(0, 0, -1), z_dir=(1, 0, 0))):
        Circle(SKETCH13_R)
    extrude(amount=-CUT_EXTRUDE4_DEPTH, mode=Mode.SUBTRACT)

    # Cut-Extrude5 cone 1 section (through the dimple's axis) → Cut-Extrude5 (revolve, cut)
    with BuildSketch(Plane(origin=(-3.792361111, 0, 0), x_dir=(0, 0, 1), z_dir=(0, 1, 0))):
        Polygon((0, 0), (4.6228, 0), (0, 5.317923073), align=None)
    revolve(axis=Axis((-3.792361111, 0, 0), (1, 0, 0)), mode=Mode.SUBTRACT)


solid = part_3.part
